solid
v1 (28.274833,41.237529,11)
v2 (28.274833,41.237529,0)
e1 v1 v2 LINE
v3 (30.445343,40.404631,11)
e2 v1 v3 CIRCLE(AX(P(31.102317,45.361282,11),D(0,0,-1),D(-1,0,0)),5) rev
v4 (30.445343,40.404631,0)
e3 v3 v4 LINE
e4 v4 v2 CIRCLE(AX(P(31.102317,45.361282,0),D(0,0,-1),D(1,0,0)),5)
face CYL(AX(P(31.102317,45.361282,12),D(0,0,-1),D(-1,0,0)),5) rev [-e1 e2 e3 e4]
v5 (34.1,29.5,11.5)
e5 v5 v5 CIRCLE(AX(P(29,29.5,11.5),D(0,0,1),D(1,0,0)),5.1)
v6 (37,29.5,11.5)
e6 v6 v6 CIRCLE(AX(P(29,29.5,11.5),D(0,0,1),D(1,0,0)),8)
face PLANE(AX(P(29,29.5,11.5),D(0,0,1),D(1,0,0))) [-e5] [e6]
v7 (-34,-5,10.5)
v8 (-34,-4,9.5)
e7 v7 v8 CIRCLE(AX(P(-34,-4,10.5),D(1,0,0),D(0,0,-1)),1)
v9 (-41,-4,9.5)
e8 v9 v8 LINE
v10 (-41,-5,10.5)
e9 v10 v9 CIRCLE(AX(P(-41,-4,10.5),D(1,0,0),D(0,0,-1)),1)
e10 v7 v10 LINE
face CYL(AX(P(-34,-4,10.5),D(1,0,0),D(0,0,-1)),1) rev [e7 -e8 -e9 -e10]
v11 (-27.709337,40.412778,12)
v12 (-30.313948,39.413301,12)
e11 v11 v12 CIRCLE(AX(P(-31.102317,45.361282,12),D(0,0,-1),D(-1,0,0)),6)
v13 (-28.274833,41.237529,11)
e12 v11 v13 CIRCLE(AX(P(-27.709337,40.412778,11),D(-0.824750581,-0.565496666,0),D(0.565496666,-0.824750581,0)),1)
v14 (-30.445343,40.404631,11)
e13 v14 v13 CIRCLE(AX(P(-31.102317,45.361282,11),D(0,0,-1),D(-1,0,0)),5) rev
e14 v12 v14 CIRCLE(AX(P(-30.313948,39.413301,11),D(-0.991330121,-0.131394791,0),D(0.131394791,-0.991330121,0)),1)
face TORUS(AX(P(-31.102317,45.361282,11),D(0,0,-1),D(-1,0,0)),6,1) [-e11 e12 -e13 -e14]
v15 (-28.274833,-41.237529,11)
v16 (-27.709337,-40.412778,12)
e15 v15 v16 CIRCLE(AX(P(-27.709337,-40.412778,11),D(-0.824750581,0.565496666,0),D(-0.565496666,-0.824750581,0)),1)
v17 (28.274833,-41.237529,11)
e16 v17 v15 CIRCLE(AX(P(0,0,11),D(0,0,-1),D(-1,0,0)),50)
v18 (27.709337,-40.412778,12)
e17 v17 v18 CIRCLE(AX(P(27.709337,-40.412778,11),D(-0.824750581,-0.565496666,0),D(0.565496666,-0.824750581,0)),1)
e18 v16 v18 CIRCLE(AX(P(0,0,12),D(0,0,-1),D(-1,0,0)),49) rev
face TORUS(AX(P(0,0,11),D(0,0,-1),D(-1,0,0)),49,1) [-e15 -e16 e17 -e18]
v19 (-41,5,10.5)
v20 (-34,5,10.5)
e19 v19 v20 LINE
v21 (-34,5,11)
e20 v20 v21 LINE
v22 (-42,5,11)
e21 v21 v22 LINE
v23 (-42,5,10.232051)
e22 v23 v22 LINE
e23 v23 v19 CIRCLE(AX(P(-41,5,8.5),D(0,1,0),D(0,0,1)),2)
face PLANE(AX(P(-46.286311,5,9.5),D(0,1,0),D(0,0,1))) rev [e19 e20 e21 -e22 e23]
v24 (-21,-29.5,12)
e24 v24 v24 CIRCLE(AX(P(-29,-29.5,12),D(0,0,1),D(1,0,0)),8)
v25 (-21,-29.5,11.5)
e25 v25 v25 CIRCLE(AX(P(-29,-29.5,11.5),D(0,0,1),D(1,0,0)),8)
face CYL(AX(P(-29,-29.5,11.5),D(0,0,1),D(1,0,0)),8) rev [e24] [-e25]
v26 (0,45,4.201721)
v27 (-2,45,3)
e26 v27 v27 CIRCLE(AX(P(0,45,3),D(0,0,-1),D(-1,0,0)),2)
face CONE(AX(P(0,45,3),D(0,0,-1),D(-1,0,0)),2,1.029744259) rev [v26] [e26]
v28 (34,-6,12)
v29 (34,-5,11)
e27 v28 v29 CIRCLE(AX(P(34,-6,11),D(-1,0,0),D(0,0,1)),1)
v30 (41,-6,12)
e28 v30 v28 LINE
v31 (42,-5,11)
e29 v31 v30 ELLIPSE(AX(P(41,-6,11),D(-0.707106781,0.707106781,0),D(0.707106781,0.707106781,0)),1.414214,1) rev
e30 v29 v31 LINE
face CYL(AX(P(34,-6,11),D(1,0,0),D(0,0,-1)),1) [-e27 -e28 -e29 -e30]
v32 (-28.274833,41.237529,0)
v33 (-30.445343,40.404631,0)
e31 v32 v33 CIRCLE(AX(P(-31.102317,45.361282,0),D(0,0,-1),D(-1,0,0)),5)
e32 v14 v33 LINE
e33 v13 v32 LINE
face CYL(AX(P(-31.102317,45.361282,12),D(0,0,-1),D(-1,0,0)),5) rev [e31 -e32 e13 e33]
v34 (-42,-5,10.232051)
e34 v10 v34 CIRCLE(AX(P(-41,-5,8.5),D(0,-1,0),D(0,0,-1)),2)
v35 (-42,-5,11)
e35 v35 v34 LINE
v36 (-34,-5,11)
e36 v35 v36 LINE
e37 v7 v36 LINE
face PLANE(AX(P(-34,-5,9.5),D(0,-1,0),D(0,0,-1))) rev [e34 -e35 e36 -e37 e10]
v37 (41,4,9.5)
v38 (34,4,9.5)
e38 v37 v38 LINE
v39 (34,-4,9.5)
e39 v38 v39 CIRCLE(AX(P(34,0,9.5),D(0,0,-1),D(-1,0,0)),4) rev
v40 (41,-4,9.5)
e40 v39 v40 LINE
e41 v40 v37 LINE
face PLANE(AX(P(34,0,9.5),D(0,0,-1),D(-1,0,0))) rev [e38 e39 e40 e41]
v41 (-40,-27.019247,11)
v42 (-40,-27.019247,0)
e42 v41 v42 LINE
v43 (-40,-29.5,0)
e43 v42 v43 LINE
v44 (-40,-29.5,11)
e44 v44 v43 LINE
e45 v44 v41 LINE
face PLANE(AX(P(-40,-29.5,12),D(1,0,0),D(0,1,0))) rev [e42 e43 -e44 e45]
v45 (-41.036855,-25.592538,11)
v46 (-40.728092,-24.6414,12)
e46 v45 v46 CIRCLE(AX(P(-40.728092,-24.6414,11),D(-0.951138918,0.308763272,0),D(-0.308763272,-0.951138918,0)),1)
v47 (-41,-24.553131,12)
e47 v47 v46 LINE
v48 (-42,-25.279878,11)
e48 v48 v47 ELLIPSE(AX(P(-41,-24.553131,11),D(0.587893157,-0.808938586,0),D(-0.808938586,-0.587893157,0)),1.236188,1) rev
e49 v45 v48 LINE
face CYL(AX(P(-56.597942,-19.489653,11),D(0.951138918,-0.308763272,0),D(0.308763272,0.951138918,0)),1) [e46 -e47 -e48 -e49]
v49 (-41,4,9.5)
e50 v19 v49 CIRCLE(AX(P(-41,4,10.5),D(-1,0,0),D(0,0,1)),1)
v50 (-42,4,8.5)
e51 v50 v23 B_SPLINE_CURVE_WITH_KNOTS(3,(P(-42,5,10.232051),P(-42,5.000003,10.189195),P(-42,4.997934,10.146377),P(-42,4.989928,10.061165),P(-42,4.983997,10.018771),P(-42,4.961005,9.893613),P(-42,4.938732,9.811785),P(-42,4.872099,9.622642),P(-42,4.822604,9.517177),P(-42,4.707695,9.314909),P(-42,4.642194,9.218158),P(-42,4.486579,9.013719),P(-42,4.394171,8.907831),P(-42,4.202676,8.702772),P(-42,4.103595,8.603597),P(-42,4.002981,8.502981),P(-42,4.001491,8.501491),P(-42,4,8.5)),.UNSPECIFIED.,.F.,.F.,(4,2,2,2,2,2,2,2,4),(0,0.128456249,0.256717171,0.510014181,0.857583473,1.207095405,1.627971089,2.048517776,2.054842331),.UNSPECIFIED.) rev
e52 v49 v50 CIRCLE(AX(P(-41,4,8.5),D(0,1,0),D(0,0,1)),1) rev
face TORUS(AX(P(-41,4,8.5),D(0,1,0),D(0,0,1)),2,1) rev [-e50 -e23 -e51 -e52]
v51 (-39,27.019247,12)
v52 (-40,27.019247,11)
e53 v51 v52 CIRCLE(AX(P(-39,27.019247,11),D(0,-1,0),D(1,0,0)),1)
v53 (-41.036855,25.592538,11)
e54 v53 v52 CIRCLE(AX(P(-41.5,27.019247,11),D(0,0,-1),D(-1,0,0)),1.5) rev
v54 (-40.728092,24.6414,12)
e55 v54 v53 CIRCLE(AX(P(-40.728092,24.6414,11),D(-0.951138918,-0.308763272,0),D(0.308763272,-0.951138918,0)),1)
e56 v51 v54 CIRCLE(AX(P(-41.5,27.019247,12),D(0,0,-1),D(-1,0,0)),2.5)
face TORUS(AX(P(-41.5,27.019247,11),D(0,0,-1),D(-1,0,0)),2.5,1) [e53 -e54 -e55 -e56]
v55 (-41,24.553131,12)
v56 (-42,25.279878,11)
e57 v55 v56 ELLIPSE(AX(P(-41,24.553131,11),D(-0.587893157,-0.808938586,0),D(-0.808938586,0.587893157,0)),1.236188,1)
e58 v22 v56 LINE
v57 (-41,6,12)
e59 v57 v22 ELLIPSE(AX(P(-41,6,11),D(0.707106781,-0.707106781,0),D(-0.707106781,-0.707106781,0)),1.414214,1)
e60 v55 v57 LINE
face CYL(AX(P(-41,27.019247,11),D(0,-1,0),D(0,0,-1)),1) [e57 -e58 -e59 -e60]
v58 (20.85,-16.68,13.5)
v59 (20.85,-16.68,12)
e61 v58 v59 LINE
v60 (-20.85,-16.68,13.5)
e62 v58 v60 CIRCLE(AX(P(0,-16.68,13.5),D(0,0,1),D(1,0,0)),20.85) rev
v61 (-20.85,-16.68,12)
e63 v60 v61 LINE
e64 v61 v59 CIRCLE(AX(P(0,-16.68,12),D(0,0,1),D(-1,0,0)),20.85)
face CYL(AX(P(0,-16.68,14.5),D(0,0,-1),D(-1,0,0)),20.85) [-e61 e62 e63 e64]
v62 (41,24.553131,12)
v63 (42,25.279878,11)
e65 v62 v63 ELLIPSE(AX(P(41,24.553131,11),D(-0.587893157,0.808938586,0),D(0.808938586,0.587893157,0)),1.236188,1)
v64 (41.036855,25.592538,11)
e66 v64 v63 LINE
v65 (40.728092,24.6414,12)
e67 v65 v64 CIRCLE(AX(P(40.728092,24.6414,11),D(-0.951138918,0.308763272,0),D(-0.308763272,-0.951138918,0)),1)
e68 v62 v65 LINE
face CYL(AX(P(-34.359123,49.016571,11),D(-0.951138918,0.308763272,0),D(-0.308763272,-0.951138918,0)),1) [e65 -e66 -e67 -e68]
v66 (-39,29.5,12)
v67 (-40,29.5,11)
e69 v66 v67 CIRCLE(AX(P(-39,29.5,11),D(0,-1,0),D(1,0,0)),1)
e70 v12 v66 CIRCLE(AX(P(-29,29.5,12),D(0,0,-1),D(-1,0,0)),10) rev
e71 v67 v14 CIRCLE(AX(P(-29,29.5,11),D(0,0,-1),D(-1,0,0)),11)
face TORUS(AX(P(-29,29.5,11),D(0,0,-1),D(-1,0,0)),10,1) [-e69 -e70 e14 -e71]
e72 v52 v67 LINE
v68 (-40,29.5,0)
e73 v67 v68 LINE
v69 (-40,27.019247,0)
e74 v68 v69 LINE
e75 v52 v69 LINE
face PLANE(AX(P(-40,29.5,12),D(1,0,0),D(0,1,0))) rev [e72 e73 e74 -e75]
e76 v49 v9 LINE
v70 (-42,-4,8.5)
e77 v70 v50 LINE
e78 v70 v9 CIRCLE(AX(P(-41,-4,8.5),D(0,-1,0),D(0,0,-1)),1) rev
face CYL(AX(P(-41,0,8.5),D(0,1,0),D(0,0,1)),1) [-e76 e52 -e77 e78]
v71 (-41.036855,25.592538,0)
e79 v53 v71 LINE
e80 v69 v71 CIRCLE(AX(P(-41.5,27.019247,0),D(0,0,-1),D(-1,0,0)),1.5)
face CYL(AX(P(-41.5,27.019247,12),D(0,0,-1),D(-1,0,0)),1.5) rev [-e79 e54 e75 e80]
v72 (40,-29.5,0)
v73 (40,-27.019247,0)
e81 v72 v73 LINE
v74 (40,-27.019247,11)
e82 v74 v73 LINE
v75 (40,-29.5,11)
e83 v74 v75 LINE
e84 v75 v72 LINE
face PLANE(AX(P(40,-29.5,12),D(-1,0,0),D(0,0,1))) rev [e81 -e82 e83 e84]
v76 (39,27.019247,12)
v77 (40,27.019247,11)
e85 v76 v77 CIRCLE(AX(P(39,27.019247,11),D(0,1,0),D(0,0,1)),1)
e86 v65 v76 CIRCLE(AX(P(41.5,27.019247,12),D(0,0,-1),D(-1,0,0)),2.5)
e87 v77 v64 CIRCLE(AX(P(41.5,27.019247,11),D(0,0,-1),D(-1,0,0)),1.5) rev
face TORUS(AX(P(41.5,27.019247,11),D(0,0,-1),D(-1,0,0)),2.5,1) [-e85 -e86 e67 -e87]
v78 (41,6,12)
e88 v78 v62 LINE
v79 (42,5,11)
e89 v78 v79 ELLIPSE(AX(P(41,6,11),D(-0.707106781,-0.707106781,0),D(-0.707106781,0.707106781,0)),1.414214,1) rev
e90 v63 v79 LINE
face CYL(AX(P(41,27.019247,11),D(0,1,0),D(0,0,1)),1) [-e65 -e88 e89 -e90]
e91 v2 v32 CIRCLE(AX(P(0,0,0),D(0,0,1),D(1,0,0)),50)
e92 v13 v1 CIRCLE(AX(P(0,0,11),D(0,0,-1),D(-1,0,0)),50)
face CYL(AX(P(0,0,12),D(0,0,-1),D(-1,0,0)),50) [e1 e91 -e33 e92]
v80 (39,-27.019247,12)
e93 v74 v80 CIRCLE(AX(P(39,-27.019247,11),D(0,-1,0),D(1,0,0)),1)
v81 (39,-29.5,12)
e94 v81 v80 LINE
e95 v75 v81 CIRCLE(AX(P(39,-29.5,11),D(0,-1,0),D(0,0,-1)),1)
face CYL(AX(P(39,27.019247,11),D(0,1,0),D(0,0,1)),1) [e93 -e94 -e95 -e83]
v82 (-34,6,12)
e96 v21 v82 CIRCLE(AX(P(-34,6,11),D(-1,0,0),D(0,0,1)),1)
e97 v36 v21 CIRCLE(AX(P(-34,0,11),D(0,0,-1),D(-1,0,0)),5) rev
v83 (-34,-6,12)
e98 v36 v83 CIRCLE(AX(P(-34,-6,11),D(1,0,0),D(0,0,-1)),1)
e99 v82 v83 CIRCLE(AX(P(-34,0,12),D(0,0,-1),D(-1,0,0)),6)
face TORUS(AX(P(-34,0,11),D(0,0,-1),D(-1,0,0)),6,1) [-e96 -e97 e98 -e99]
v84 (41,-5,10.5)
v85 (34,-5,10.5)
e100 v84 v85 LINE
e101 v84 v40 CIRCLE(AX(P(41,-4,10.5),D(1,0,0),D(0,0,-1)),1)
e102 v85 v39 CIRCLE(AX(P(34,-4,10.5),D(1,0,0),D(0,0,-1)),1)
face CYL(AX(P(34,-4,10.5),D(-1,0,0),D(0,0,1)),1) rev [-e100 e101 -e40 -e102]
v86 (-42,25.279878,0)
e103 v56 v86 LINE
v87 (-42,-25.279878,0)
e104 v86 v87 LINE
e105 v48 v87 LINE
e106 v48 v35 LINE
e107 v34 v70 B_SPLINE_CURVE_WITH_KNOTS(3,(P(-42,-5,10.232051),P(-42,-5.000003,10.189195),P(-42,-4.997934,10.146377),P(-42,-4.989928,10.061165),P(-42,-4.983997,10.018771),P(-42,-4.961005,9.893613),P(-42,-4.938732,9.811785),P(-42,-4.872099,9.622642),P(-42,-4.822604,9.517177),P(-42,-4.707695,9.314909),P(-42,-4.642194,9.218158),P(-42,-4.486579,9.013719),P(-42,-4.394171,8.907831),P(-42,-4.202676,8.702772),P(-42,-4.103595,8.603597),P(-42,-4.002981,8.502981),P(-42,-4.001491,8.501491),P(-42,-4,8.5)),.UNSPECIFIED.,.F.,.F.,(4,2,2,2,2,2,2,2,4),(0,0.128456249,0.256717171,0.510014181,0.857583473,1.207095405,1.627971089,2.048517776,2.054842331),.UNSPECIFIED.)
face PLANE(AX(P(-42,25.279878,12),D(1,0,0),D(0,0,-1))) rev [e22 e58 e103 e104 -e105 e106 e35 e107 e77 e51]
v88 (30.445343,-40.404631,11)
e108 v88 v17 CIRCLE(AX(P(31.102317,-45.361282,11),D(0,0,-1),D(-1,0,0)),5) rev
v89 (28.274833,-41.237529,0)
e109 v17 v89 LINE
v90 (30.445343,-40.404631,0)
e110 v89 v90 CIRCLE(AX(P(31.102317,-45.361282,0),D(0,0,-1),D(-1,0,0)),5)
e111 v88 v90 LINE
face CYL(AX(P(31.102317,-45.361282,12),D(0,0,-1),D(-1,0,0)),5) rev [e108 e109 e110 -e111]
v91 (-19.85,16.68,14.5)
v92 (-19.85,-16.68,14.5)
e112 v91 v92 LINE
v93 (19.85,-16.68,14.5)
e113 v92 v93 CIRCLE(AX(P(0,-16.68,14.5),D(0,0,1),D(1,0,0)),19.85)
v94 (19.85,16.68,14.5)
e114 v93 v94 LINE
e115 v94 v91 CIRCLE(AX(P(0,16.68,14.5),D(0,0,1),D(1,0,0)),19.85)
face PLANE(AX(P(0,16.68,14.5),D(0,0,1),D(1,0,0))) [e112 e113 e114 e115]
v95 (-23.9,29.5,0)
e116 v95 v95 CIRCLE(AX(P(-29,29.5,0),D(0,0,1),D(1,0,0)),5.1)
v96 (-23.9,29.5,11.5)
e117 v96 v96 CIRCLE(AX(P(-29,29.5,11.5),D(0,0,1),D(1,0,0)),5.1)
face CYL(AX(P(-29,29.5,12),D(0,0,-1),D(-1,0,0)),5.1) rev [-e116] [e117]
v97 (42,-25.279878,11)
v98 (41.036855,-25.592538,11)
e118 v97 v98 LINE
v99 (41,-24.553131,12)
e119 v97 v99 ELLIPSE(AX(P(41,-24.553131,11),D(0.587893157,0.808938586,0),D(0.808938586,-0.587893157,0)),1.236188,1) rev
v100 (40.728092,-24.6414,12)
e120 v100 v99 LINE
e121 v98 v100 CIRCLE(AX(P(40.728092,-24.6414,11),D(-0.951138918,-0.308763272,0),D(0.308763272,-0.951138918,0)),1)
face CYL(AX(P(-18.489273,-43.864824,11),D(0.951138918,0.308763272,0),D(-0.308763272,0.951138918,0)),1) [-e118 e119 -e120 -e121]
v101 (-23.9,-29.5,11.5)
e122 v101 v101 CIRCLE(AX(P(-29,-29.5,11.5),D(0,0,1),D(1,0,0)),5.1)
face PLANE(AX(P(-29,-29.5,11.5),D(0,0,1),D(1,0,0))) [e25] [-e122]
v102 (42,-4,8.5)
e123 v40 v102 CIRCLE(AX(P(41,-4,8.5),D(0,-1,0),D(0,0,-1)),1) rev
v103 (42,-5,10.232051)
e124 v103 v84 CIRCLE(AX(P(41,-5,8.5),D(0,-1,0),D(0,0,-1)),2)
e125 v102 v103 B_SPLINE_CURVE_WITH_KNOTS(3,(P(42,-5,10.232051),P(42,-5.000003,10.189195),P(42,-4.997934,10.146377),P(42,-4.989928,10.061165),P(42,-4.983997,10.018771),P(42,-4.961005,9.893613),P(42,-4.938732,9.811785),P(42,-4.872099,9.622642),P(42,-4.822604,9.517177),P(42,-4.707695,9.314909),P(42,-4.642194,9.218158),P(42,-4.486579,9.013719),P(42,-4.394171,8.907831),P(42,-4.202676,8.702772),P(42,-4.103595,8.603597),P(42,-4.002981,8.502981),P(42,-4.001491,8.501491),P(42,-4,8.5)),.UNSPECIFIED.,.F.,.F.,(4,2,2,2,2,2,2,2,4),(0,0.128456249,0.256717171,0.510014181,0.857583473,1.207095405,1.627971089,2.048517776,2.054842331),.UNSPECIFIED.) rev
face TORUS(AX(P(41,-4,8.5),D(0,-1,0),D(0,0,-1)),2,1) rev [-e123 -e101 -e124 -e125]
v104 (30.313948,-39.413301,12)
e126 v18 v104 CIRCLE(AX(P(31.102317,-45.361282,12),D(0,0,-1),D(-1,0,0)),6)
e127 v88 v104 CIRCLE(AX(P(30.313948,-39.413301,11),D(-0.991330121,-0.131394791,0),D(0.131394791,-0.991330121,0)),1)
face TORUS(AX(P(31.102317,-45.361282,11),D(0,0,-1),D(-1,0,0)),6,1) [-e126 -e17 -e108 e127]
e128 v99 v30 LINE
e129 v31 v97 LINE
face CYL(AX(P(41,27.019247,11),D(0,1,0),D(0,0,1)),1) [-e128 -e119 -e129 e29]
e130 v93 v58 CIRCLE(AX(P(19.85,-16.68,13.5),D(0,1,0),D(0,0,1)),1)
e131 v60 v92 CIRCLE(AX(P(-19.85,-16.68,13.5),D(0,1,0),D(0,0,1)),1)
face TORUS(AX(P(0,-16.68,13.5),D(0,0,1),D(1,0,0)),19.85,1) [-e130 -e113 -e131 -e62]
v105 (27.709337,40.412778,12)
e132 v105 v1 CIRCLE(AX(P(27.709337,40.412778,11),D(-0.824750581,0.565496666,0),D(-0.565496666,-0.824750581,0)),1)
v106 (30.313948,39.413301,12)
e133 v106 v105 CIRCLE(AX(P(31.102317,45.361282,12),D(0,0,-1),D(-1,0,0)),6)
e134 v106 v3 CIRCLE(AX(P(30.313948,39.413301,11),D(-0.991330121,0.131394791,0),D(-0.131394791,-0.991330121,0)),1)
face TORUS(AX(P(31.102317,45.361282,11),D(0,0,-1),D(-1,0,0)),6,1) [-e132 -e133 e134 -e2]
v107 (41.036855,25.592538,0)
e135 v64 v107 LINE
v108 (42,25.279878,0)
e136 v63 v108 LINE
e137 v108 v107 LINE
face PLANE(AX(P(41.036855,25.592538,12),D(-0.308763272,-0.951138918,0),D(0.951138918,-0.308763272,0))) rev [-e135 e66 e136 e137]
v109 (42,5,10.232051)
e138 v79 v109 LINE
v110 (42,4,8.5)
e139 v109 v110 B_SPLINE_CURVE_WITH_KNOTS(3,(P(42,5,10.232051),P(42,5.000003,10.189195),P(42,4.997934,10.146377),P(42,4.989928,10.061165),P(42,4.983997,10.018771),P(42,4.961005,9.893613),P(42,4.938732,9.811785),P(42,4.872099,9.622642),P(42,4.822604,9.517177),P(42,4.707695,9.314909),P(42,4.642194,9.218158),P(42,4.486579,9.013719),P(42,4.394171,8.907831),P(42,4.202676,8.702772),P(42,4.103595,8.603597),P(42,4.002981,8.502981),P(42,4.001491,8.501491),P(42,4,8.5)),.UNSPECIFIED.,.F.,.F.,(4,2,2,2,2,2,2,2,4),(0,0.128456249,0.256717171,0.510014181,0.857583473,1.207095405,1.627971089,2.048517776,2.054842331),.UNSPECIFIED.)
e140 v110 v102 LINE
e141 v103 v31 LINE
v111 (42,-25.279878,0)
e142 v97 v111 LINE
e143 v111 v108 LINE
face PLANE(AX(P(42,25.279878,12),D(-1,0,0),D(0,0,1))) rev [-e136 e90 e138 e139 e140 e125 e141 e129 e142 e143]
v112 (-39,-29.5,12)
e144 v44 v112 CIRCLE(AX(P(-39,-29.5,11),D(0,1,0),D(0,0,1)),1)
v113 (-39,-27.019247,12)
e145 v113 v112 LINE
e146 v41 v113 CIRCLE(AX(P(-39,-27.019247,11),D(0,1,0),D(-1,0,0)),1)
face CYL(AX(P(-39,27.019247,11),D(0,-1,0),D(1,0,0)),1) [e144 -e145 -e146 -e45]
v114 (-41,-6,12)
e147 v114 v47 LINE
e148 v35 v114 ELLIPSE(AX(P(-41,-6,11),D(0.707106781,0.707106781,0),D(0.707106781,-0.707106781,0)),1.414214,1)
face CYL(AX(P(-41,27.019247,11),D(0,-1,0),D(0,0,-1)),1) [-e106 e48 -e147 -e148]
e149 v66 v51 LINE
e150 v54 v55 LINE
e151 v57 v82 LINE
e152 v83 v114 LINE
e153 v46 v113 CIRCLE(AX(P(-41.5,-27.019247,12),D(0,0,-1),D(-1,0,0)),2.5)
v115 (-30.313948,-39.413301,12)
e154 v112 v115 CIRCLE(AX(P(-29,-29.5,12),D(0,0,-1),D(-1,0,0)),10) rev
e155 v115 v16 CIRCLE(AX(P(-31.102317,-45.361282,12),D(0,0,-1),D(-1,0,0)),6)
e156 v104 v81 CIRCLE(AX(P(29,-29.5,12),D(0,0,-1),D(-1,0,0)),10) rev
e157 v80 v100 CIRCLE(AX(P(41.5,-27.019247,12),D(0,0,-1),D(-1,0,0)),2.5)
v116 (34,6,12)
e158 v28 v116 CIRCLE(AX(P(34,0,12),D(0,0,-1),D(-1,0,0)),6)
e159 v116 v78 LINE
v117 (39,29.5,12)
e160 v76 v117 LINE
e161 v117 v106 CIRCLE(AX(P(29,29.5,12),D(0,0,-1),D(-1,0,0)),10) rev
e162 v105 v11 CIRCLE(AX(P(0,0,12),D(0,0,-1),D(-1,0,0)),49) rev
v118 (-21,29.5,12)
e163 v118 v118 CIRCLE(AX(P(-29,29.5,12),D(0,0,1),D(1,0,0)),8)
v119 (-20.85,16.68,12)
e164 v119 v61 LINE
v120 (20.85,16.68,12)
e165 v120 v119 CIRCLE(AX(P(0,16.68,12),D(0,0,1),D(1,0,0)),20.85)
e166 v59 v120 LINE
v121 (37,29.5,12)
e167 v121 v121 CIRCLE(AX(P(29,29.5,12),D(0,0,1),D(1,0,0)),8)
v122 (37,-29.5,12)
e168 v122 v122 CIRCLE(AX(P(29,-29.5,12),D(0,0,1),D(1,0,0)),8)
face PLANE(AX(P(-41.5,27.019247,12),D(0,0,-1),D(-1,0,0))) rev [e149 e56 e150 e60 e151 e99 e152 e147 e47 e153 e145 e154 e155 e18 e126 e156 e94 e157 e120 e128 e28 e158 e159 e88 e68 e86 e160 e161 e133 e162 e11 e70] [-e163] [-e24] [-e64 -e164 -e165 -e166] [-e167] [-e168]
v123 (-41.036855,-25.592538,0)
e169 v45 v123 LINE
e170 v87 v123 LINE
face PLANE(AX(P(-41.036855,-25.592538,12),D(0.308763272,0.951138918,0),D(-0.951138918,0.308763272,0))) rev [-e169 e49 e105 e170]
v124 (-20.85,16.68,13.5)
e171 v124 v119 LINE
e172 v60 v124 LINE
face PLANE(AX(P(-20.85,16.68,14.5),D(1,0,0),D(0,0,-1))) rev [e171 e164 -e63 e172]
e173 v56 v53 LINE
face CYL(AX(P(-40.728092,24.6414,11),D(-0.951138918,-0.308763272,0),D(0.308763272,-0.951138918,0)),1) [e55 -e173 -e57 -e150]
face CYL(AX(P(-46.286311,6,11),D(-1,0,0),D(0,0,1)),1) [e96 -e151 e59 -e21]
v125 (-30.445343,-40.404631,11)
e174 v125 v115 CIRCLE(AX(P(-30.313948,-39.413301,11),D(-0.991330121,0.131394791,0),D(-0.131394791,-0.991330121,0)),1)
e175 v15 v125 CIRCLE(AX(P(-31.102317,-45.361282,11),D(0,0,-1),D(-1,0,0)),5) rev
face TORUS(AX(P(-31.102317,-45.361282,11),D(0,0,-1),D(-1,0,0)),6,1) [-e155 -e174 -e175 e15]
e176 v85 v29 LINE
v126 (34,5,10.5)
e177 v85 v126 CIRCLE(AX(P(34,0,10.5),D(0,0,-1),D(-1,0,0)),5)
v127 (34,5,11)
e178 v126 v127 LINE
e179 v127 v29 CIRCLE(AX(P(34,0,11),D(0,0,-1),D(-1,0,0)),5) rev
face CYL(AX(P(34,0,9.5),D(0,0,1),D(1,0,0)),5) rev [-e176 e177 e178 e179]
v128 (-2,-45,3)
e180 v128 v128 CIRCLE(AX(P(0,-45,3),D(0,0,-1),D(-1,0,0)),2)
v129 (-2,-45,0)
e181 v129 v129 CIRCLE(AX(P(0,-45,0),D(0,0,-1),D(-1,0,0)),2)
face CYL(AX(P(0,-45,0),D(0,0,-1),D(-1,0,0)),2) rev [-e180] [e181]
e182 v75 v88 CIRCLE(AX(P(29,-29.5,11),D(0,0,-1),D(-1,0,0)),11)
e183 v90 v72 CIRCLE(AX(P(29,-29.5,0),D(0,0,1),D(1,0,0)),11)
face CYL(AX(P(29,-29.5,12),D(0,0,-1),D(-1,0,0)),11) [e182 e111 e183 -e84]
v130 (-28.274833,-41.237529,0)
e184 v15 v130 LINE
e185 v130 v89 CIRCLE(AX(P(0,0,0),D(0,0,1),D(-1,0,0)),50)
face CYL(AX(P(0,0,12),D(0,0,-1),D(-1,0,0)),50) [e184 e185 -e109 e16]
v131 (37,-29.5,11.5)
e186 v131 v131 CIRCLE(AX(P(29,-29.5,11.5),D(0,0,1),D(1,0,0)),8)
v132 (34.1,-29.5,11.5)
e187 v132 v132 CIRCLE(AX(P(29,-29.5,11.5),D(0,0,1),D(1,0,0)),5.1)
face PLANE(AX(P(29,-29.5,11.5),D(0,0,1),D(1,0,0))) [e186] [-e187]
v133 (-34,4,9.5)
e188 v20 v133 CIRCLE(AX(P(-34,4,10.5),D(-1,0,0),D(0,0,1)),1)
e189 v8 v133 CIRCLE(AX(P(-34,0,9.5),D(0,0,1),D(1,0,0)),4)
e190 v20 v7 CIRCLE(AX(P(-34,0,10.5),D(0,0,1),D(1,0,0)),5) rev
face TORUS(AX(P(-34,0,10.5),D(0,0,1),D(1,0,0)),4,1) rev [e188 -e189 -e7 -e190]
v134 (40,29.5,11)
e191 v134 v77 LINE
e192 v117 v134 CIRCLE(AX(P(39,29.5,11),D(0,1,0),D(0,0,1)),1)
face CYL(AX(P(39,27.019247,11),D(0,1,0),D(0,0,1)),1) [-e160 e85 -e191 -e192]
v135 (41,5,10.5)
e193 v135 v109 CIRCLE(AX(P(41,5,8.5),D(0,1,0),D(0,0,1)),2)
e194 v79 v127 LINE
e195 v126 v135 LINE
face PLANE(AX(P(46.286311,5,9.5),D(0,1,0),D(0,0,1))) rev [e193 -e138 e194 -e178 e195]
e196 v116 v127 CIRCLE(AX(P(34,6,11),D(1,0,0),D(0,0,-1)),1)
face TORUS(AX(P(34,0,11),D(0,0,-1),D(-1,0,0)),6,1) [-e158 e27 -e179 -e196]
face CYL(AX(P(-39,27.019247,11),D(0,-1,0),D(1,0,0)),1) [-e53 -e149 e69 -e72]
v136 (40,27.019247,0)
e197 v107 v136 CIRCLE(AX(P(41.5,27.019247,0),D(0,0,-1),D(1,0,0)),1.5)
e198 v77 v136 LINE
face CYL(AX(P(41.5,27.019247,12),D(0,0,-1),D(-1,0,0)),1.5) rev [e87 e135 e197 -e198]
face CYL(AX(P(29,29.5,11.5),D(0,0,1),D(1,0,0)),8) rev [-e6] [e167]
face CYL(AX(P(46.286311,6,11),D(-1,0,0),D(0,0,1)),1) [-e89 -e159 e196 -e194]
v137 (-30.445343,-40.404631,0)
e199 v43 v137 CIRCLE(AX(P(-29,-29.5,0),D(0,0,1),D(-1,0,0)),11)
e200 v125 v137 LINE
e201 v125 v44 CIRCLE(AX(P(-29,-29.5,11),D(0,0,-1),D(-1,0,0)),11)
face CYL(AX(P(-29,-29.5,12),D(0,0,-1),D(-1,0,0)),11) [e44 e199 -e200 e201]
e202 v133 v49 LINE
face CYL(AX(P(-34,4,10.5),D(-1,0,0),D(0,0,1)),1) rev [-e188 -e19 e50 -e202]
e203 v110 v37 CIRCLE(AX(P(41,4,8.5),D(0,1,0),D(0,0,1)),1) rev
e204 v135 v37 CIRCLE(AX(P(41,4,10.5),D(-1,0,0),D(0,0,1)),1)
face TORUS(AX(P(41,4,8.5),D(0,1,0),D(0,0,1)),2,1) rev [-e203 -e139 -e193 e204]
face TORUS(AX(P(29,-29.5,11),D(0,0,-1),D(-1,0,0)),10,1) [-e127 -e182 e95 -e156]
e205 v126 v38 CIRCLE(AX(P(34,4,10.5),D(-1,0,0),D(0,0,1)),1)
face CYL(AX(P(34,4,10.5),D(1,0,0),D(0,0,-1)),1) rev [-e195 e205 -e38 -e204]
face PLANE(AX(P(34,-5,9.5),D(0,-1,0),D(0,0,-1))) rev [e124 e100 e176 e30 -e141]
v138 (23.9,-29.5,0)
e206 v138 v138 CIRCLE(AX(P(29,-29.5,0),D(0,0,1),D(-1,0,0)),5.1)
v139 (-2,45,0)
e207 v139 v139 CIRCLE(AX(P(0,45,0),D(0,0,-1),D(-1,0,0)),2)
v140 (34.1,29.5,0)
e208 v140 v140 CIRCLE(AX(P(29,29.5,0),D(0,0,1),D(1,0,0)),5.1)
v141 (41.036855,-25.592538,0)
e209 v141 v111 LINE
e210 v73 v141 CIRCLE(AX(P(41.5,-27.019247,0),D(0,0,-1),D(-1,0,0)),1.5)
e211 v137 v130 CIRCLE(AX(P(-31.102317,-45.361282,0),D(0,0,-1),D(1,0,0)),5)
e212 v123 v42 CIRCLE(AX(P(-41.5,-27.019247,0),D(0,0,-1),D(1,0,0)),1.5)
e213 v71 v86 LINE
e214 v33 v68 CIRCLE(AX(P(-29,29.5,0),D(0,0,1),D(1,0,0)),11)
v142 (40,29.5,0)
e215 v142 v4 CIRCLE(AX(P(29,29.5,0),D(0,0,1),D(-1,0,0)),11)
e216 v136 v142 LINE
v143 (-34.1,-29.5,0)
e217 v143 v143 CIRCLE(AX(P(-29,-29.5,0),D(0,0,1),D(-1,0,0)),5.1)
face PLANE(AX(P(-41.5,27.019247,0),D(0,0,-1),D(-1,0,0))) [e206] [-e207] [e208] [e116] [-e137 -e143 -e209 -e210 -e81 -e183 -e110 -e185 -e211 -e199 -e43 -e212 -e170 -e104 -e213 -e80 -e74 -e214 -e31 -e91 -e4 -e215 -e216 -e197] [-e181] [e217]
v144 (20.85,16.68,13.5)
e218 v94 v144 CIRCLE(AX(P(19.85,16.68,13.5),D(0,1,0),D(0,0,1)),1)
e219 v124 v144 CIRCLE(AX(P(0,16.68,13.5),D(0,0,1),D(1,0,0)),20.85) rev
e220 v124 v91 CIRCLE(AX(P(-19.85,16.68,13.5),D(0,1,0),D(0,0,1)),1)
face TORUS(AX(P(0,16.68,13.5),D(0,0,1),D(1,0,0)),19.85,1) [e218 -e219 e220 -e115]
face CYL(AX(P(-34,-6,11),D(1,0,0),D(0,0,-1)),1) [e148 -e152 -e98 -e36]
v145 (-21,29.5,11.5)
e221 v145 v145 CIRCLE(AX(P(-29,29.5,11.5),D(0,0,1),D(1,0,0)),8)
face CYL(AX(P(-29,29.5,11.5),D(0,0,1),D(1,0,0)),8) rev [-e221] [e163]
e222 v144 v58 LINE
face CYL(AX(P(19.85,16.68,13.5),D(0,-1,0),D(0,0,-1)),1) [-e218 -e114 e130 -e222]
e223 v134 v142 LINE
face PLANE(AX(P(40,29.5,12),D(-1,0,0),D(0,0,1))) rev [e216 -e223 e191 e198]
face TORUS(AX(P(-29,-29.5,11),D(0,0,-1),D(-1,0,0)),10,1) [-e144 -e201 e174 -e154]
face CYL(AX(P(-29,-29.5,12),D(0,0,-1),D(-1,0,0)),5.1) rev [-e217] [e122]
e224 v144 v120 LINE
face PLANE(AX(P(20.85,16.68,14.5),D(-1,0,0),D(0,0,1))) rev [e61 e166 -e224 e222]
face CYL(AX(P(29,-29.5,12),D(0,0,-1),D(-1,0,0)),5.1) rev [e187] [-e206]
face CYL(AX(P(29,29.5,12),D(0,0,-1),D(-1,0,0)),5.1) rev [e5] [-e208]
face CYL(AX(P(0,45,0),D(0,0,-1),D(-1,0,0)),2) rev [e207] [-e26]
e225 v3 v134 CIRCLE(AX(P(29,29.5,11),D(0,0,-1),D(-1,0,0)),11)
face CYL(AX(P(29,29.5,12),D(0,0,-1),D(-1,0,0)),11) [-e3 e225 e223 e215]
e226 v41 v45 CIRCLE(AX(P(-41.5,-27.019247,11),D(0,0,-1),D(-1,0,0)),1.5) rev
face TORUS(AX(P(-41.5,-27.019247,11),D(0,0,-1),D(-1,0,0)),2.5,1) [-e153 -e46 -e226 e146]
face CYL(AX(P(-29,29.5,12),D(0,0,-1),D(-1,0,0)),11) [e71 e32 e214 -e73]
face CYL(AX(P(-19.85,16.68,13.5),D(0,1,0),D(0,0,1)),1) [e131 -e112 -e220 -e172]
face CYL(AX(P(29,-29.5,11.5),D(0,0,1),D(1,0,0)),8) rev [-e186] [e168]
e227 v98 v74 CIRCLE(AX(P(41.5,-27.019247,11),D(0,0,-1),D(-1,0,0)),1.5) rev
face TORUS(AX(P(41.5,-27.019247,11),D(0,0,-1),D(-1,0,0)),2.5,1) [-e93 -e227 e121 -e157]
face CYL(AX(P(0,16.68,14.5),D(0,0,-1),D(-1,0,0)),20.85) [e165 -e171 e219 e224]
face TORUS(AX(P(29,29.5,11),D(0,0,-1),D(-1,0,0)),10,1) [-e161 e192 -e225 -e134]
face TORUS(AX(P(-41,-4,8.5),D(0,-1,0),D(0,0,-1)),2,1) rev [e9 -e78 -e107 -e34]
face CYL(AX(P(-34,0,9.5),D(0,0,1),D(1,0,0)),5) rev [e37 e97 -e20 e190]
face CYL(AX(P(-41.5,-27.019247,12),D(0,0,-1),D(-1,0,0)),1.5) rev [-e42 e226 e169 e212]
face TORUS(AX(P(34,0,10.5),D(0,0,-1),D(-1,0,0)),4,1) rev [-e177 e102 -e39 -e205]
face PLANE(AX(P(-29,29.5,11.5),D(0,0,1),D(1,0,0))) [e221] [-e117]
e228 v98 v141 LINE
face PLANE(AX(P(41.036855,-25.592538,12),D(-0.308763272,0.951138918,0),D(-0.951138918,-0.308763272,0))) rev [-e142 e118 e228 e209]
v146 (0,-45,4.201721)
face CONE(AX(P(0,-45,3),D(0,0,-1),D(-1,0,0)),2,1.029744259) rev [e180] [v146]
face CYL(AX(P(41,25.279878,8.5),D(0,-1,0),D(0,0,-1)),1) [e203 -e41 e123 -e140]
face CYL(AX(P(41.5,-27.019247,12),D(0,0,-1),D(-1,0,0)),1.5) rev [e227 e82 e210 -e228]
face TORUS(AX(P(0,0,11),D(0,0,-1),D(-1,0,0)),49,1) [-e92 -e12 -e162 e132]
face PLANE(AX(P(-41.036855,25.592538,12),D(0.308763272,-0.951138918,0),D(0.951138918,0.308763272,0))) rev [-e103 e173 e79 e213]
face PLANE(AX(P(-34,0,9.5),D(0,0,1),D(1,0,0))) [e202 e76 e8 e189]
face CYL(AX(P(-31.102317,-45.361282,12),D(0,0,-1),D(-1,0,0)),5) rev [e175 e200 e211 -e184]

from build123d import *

# Parameters (mm, degrees)
SKETCH1_R                    = 5.1
BOSS_EXTRUDE1_DEPTH          = 12
BOSS_EXTRUDE2_DEPTH          = 2.5
CUT_EXTRUDE1_DEPTH           = 2.5
SKETCH4_R                    = 8
CUT_EXTRUDE3_DEPTH           = 0.5
FILLET1_R                    = 1
FILLET2_R                    = 1
FILLET3_R                    = 1
F_4_0_4_DIAMETER_HOLE2_D     = 4
F_4_0_4_DIAMETER_HOLE2_DEPTH = 3
F_4_0_4_DIAMETER_HOLE2_TIP   = 1.201721238


with BuildPart() as part:
    # Sketch1 → Boss-Extrude1 (new body)
    with BuildSketch(Plane.XY):
        with BuildLine():
            Line((-40, 29.5), (-40, 27.019246817))
            ThreePointArc((-40, 27.019246817), (-40.286592121, 26.137407082), (-41.036855092, 25.59253844))
            Line((-41.036855092, 25.59253844), (-42, 25.279877726))
            Line((-42, 25.279877726), (-42, -25.279877726))
            Line((-42, -25.279877726), (-41.036855092, -25.59253844))
            ThreePointArc((-41.036855092, -25.59253844), (-40.286592121, -26.137407082), (-40, -27.019246817))
            Line((-40, -27.019246817), (-40, -29.5))
            ThreePointArc((-40, -29.5), (-37.273414339, -36.74918031), (-30.445342697, -40.404631332))
            ThreePointArc((-30.445342697, -40.404631332), (-29.311006992, -40.693176357), (-28.274833318, -41.237529034))
            ThreePointArc((-28.274833318, -41.237529034), (0, -50), (28.274833318, -41.237529034))
            ThreePointArc((28.274833318, -41.237529034), (29.311006992, -40.693176357), (30.445342697, -40.404631332))
            ThreePointArc((30.445342697, -40.404631332), (37.273414339, -36.74918031), (40, -29.5))
            Line((40, -29.5), (40, -27.019246817))
            ThreePointArc((40, -27.019246817), (40.286592121, -26.137407082), (41.036855092, -25.59253844))
            Line((41.036855092, -25.59253844), (42, -25.279877726))
            Line((42, -25.279877726), (42, 25.279877726))
            Line((42, 25.279877726), (41.036855092, 25.59253844))
            ThreePointArc((41.036855092, 25.59253844), (40.286592121, 26.137407082), (40, 27.019246817))
            Line((40, 27.019246817), (40, 29.5))
            ThreePointArc((40, 29.5), (37.273414339, 36.74918031), (30.445342697, 40.404631332))
            ThreePointArc((30.445342697, 40.404631332), (29.311006992, 40.693176357), (28.274833318, 41.237529034))
            ThreePointArc((28.274833318, 41.237529034), (0, 50), (-28.274833318, 41.237529034))
            ThreePointArc((-28.274833318, 41.237529034), (-29.311006992, 40.693176357), (-30.445342697, 40.404631332))
            ThreePointArc((-30.445342697, 40.404631332), (-37.273414339, 36.74918031), (-40, 29.5))
        make_face()
        with Locations((-29, 29.5)):
            Circle(SKETCH1_R, mode=Mode.SUBTRACT)
        with Locations((29, 29.5)):
            Circle(SKETCH1_R, mode=Mode.SUBTRACT)
        with Locations(Location((29, -29.5, 0), (0, 0, 180))):
            Circle(SKETCH1_R, mode=Mode.SUBTRACT)
        with Locations(Location((-29, -29.5, 0), (0, 0, 180))):
            Circle(SKETCH1_R, mode=Mode.SUBTRACT)
    extrude(amount=BOSS_EXTRUDE1_DEPTH)

    # Sketch2 → Boss-Extrude2 (add)
    with BuildSketch(Plane.XY.offset(12)):
        with BuildLine():
            Line((20.85, 16.68), (20.85, -16.68))
            ThreePointArc((20.85, -16.68), (0, -37.53), (-20.85, -16.68))
            Line((-20.85, -16.68), (-20.85, 16.68))
            ThreePointArc((-20.85, 16.68), (0, 37.53), (20.85, 16.68))
        make_face()
    extrude(amount=BOSS_EXTRUDE2_DEPTH)

    # Sketch3 → Cut-Extrude1 (cut)
    with BuildSketch(Plane.XY.offset(12)):
        with BuildLine():
            Line((-34, -5), (-46.286310745, -5))
            Line((-46.286310745, -5), (-46.286310745, 5))
            Line((-46.286310745, 5), (-34, 5))
            ThreePointArc((-34, 5), (-29, 0), (-34, -5))
        make_face()
        with BuildLine():
            Line((46.286310745, -5), (46.286310745, 5))
            Line((46.286310745, 5), (34, 5))
            ThreePointArc((34, 5), (29, 0), (34, -5))
            Line((34, -5), (46.286310745, -5))
        make_face()
    extrude(amount=-CUT_EXTRUDE1_DEPTH, mode=Mode.SUBTRACT)

    # Sketch4 → Cut-Extrude3 (cut)
    with BuildSketch(Plane.XY.offset(12)):
        with Locations((-29, 29.5)):
            Circle(SKETCH4_R)
        with Locations((29, 29.5)):
            Circle(SKETCH4_R)
        with Locations((29, -29.5)):
            Circle(SKETCH4_R)
        with Locations((-29, -29.5)):
            Circle(SKETCH4_R)
    extrude(amount=-CUT_EXTRUDE3_DEPTH, mode=Mode.SUBTRACT)

    # Fillet1
    fillet1_edges = [part.edges().sort_by_distance(p)[0] for p in [
        (-38, 5, 12),
        (-38, -5, 12),
        (-29, 0, 12),
        (38, 5, 12),
        (29, 0, 12),
        (38, -5, 12),
        (-42, 15.139938863, 12),
        (-41.518427546, -25.436208083, 12),
        (-40.286592121, -26.137407082, 12),
        (-40, -28.259623409, 12),
        (-37.273414339, -36.74918031, 12),
        (-29.311006992, -40.693176357, 12),
        (0, -50, 12),
        (29.311006992, -40.693176357, 12),
        (37.273414339, -36.74918031, 12),
        (40, -28.259623409, 12),
        (-40.286592121, 26.137407082, 12),
        (40.286592121, -26.137407082, 12),
        (41.518427546, -25.436208083, 12),
        (42, -15.139938863, 12),
        (41.518427546, 25.436208083, 12),
        (40.286592121, 26.137407082, 12),
        (40, 28.259623409, 12),
        (37.273414339, 36.74918031, 12),
        (29.311006992, 40.693176357, 12),
        (0, 50, 12),
        (0, 37.53, 14.5),
        (-20.85, 0, 14.5),
        (0, -37.53, 14.5),
        (-29.311006992, 40.693176357, 12),
        (20.85, 0, 14.5),
        (-41.518427546, 25.436208083, 12),
        (-37.273414339, 36.74918031, 12),
        (-40, 28.259623409, 12),
        (42, 15.139938863, 12),
        (42, 0, 9.5),
        (-42, -15.139938863, 12),
        (-42, 0, 9.5),
    ]]
    fillet(fillet1_edges, radius=FILLET1_R)

    # Fillet2
    # the kernel refuses this fillet: 1 mm, written as the material it adds along each edge
    with BuildSketch(Plane(origin=(-41, 5, 9.5), x_dir=(0, -1, 0), z_dir=(1, 0, 0)), Plane(origin=(-34, -5, 9.5), x_dir=(0, 1, 0), z_dir=(-1, 0, 0))) as fillet2_piece_1:
        with BuildLine():
            CenterArc((FILLET2_R, -FILLET2_R), FILLET2_R, 90, 90)
            Line((0, -FILLET2_R), (0, 0))
            Line((0, 0), (FILLET2_R, 0))
        make_face()
    extrude(amount=7)
    with BuildSketch(Plane(origin=(-34, 0, 9.5), x_dir=(0, 1, 0), z_dir=(-1, 0, 0))) as fillet2_piece_2:
        with BuildLine():
            CenterArc((5 - FILLET2_R, -FILLET2_R), FILLET2_R, 0, 90)
            Line((5 - FILLET2_R, 0), (5, 0))
            Line((5, 0), (5, -FILLET2_R))
        make_face()
    revolve(axis=Axis((-34, 0, 9.5), (0, 0, -1)), revolution_arc=180)
    with BuildSketch(Plane(origin=(-41, -5, 8.5), x_dir=(0.8017442392976482, 0, -0.5976672776328277), z_dir=(0.5976672776328277, 0, 0.8017442392976482))) as fillet2_piece_3_section:
        with BuildLine():
            CenterArc((1 + FILLET2_R, FILLET2_R), FILLET2_R, 180, 90)
            Line((1, FILLET2_R), (1, 0))
            Line((1, 0), (1 + FILLET2_R, 0))
        make_face()
    fillet2_piece_3 = revolve(axis=Axis((-41, -5, 8.5), (0, 1, 0)), revolution_arc=233.296989237, mode=Mode.PRIVATE)
    fillet2_piece_3 = split(fillet2_piece_3, bisect_by=Plane(origin=(-42, -4.688371715, 9.249938952), z_dir=(1, 0, 0)), keep=Keep.TOP, mode=Mode.PRIVATE)
    add(fillet2_piece_3)
    with BuildSketch(Plane(origin=(-41, 5, 8.5), x_dir=(0.8017442392976482, 0, -0.5976672776328277), z_dir=(0.5976672776328277, 0, 0.8017442392976482))) as fillet2_piece_4_section:
        with BuildLine():
            CenterArc((1 + FILLET2_R, -FILLET2_R), FILLET2_R, 90, 90)
            Line((1 + FILLET2_R, 0), (1, 0))
            Line((1, 0), (1, -FILLET2_R))
        make_face()
    fillet2_piece_4 = revolve(axis=Axis((-41, 5, 8.5), (0, 1, 0)), revolution_arc=233.296989237, mode=Mode.PRIVATE)
    fillet2_piece_4 = split(fillet2_piece_4, bisect_by=Plane(origin=(-42, 4.688371693, 9.249938947), z_dir=(1, 0, 0)), keep=Keep.TOP, mode=Mode.PRIVATE)
    add(fillet2_piece_4)

    # Fillet3
    # the kernel refuses this fillet: 1 mm, written as the material it adds along each edge
    with BuildSketch(Plane(origin=(34, -5, 9.5), x_dir=(0, 0, 1), z_dir=(1, 0, 0)), Plane(origin=(41, 5, 9.5), x_dir=(0, 0, 1), z_dir=(-1, 0, 0))) as fillet3_piece_1:
        with BuildLine():
            CenterArc((FILLET3_R, -FILLET3_R), FILLET3_R, 90, 90)
            Line((0, -FILLET3_R), (0, 0))
            Line((0, 0), (FILLET3_R, 0))
        make_face()
    extrude(amount=7)
    with BuildSketch(Plane(origin=(34, 0, 9.5), x_dir=(0, 1, 0), z_dir=(1, 0, 0))) as fillet3_piece_2:
        with BuildLine():
            CenterArc((5 - FILLET3_R, FILLET3_R), FILLET3_R, 270, 90)
            Line((5 - FILLET3_R, 0), (5, 0))
            Line((5, 0), (5, FILLET3_R))
        make_face()
    revolve(axis=Axis((34, 0, 9.5), (0, 0, 1)), revolution_arc=180)
    with BuildSketch(Plane(origin=(41, -5, 8.5), x_dir=(-0.8017442392976482, 0, -0.5976672776328277), z_dir=(-0.5976672776328277, 0, 0.8017442392976482))) as fillet3_piece_3_section:
        with BuildLine():
            CenterArc((1 + FILLET3_R, -FILLET3_R), FILLET3_R, 90, 90)
            Line((1, -FILLET3_R), (1, 0))
            Line((1, 0), (1 + FILLET3_R, 0))
        make_face()
    fillet3_piece_3 = revolve(axis=Axis((41, -5, 8.5), (0, -1, 0)), revolution_arc=233.296989237, mode=Mode.PRIVATE)
    fillet3_piece_3 = split(fillet3_piece_3, bisect_by=Plane(origin=(42, -4.688371714, 9.249938953), z_dir=(-1, 0, 0)), keep=Keep.TOP, mode=Mode.PRIVATE)
    add(fillet3_piece_3)
    with BuildSketch(Plane(origin=(41, 5, 8.5), x_dir=(-0.8017442392976482, 0, -0.5976672776328277), z_dir=(-0.5976672776328277, 0, 0.8017442392976482))) as fillet3_piece_4_section:
        with BuildLine():
            CenterArc((1 + FILLET3_R, FILLET3_R), FILLET3_R, 180, 90)
            Line((1 + FILLET3_R, 0), (1, 0))
            Line((1, 0), (1, FILLET3_R))
        make_face()
    fillet3_piece_4 = revolve(axis=Axis((41, 5, 8.5), (0, -1, 0)), revolution_arc=233.296989237, mode=Mode.PRIVATE)
    fillet3_piece_4 = split(fillet3_piece_4, bisect_by=Plane(origin=(42, 4.688371695, 9.249938947), z_dir=(-1, 0, 0)), keep=Keep.TOP, mode=Mode.PRIVATE)
    add(fillet3_piece_4)

    # Ø4.0 (4) Diameter Hole2
    with Locations(Plane(origin=(0, 0, 0), x_dir=(-1, 0, 0), z_dir=(0, 0, -1))):
        with Locations((0, 45), (0, -45)):
            Hole(F_4_0_4_DIAMETER_HOLE2_D / 2, depth=F_4_0_4_DIAMETER_HOLE2_DEPTH)
            with Locations((0, 0, -(F_4_0_4_DIAMETER_HOLE2_DEPTH + F_4_0_4_DIAMETER_HOLE2_TIP / 2))):  # 118° drill point
                Cone(0, F_4_0_4_DIAMETER_HOLE2_D / 2, F_4_0_4_DIAMETER_HOLE2_TIP, mode=Mode.SUBTRACT)


solid = part.part
